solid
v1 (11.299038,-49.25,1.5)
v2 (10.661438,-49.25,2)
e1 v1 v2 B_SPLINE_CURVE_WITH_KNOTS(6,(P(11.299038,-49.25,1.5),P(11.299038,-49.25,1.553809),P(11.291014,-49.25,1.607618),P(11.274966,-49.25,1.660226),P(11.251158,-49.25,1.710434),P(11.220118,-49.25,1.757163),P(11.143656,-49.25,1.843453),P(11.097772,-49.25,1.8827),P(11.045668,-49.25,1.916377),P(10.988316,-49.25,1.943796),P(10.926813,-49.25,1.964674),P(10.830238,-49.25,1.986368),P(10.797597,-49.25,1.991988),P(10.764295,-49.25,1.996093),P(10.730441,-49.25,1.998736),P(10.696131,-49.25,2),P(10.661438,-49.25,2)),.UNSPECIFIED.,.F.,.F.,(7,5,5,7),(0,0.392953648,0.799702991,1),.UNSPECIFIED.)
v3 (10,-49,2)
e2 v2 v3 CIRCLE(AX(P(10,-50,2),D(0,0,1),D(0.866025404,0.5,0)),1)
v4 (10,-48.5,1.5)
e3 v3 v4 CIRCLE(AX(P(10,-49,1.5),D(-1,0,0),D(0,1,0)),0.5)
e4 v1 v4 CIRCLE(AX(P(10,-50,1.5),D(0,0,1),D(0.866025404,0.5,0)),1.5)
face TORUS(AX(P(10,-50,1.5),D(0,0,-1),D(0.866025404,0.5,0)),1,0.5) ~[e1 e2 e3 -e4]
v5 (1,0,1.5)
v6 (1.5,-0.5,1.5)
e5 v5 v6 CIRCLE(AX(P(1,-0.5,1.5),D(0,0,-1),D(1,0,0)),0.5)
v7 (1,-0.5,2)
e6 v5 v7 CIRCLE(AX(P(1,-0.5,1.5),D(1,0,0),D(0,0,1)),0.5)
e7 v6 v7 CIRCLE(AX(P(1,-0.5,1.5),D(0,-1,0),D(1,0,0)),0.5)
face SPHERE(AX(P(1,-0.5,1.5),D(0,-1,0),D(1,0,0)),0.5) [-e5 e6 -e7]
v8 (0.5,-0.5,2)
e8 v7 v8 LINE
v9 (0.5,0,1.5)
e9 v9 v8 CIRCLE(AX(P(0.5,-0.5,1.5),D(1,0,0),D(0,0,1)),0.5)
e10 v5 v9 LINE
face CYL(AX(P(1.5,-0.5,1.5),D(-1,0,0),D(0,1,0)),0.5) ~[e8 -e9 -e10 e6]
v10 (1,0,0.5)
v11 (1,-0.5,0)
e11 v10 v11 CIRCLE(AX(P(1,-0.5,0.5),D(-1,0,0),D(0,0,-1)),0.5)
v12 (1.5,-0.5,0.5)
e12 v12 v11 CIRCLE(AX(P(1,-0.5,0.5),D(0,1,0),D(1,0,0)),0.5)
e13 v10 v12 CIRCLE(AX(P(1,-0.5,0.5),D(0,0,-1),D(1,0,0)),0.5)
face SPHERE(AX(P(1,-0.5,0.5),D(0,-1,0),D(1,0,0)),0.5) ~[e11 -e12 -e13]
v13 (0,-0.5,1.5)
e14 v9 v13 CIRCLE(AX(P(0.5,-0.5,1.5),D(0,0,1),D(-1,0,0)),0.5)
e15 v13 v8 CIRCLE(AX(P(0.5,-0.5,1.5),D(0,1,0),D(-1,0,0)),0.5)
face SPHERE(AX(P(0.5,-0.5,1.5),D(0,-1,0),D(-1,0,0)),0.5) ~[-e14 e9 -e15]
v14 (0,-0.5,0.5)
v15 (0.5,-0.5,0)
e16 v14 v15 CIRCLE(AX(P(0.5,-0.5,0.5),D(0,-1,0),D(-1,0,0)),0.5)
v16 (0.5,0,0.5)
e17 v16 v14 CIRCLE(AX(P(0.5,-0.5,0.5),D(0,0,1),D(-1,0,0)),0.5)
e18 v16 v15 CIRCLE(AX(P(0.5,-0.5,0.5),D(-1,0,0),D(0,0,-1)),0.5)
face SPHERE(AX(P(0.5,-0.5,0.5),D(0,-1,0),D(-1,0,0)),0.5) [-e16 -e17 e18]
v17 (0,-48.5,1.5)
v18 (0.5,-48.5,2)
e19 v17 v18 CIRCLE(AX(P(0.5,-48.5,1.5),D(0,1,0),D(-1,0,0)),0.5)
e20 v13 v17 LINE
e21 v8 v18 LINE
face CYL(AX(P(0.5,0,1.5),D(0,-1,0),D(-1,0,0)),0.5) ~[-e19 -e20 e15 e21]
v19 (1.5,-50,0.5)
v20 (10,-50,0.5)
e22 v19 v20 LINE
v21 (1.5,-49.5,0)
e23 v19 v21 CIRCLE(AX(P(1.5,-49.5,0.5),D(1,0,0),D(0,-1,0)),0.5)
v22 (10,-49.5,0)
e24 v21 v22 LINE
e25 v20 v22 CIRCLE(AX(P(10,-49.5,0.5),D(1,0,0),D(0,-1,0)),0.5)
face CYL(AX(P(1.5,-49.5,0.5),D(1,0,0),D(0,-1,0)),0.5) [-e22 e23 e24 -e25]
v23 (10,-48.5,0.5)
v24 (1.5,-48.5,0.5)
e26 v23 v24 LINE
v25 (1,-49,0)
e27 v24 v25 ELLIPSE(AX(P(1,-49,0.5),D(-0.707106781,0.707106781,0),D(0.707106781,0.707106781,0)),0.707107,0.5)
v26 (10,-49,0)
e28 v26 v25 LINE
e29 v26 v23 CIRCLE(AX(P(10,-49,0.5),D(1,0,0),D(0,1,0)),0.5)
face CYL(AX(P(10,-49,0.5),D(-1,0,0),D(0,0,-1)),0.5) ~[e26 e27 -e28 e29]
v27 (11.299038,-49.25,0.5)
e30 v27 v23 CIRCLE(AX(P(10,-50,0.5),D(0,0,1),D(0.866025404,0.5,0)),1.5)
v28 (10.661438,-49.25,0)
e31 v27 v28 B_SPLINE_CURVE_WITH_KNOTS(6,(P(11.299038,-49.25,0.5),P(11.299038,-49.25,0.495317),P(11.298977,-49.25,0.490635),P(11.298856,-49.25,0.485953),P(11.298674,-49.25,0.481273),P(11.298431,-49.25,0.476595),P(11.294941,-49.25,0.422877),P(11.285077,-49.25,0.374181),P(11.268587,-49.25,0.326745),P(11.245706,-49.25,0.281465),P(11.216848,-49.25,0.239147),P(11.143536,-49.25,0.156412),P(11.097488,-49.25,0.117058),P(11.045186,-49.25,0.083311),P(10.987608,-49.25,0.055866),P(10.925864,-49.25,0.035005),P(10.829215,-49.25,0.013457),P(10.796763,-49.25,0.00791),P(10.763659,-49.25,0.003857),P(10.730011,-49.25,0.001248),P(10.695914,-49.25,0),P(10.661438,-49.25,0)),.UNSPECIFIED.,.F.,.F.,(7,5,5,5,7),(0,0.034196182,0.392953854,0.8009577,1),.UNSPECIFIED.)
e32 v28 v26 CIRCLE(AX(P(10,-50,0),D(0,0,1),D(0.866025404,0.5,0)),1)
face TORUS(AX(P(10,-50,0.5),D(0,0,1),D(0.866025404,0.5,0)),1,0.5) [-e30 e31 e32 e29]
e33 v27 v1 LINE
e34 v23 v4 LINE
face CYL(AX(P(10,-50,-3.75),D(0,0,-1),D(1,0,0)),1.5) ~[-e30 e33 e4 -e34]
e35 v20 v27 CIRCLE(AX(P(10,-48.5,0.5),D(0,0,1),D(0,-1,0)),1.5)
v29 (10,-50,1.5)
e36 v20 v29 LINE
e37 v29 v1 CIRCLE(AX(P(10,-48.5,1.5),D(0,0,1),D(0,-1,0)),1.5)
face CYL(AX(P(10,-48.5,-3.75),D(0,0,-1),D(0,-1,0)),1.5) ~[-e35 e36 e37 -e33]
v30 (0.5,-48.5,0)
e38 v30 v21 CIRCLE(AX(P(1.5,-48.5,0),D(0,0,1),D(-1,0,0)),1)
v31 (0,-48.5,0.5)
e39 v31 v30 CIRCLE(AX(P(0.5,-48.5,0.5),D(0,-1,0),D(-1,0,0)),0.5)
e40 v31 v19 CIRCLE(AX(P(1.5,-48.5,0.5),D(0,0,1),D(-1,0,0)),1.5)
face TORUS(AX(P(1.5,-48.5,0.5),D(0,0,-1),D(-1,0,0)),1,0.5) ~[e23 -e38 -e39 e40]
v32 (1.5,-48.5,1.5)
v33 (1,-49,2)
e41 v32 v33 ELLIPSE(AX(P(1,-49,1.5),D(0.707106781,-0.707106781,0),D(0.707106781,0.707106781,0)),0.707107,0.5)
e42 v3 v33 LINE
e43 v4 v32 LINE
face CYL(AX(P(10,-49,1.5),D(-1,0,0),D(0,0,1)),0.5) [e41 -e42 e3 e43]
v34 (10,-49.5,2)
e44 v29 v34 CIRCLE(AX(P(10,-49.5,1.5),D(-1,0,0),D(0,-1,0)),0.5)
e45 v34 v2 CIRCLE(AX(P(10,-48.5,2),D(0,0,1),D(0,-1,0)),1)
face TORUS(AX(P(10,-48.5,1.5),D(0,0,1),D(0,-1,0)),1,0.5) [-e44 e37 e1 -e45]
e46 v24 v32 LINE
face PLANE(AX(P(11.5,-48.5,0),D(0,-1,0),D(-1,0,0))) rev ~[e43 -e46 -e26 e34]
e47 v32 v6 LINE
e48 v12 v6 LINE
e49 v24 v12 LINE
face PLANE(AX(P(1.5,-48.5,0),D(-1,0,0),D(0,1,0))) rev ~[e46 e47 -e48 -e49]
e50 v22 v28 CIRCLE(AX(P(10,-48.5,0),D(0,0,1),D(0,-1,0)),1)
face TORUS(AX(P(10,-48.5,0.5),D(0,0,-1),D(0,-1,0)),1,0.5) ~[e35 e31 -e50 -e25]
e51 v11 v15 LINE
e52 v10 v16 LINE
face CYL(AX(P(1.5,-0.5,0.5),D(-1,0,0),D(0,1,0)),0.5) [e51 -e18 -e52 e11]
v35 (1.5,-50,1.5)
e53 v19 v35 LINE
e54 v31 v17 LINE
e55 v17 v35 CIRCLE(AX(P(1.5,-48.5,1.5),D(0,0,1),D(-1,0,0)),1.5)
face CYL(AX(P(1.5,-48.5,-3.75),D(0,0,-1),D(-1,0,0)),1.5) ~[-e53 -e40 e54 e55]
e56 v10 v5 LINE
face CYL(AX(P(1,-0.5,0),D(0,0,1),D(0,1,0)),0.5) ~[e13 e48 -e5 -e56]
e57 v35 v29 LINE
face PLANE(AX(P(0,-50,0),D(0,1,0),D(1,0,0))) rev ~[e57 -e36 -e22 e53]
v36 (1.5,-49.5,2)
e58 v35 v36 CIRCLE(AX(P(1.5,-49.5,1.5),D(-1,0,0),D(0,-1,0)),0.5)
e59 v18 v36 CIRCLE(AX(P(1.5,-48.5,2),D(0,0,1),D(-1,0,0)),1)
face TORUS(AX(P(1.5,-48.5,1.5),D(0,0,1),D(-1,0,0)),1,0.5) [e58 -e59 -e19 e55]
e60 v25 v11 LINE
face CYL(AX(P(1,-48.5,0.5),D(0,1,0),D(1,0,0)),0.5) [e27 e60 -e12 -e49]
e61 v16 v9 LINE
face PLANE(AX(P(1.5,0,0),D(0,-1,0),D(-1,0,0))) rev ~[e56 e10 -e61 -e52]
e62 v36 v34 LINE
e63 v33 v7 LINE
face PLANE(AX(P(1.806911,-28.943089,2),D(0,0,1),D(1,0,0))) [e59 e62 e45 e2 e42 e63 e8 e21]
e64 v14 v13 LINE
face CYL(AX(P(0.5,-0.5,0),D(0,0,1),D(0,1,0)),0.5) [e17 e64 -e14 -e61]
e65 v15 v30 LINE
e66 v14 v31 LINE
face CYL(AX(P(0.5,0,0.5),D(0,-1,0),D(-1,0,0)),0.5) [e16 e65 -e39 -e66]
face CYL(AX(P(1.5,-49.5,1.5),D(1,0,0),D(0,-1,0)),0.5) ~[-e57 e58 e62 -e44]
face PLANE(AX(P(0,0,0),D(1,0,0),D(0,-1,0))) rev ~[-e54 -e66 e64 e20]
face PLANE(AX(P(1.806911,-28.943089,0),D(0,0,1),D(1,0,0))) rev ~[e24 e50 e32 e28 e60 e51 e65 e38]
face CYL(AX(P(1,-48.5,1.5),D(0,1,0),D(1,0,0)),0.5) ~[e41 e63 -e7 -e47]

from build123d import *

# Parameters (mm, degrees)
F1_DEPTH    = 2
F2_T1_DEPTH = 9.5
F3_R        = 0.5


# Not quite as in the source:
# - a fillet or chamfer that OpenCascade refuses, or shapes differently, is made with other operations: its cross-section is extruded or revolved along the edge and cut away or added


with BuildPart() as f1:
    # F0 (on Top) → F1 (new body)
    with BuildSketch(Plane.XY):
        Polygon((1.5, 0), (0, 0), (0, -50), (11.5, -50), (11.5, -48.5), (1.5, -48.5), align=None)
    extrude(amount=F1_DEPTH)

    # F2: fillet of radius 1.5 on 3 edges, made by hand

    # F2_s2 → F2_t1 (cut)
    with BuildSketch(Plane.XY.offset(-3.75)):
        with BuildLine():
            ThreePointArc((10, -50), (11.0606601718, -49.5606601718), (11.5, -48.5))
            Line((11.5, -48.5), (11.5, -50))
            Line((11.5, -50), (10, -50))
        make_face()
        with BuildLine():
            ThreePointArc((0, -48.5), (0.4393398282, -49.5606601718), (1.5, -50))
            Line((1.5, -50), (0, -50))
            Line((0, -50), (0, -48.5))
        make_face()
        with BuildLine():
            ThreePointArc((11.5, -50), (11.0606601718, -48.9393398282), (10, -48.5))
            Line((10, -48.5), (11.5, -48.5))
            Line((11.5, -48.5), (11.5, -50))
        make_face()
    extrude(amount=F2_T1_DEPTH, mode=Mode.SUBTRACT)

    # F3
    f3_edges = [f1.edges().sort_by_distance(p)[0] for p in [
        (0, -24.25, 2),
        (0, -24.25, 0),
        (1.5, -24.25, 0),
        (1.5, -24.25, 2),
        (1.5, 0, 1),
        (0, 0, 1),
        (0.75, 0, 0),
        (0.75, 0, 2),
        (5.75, -48.5, 0),
        (10.75, -48.700962, 0),
        (10.75, -49.799038, 0),
        (5.75, -50, 0),
        (0.43934, -49.56066, 0),
        (5.75, -48.5, 2),
        (10.75, -48.700962, 2),
        (10.75, -49.799038, 2),
        (5.75, -50, 2),
        (0.43934, -49.56066, 2),
    ]]
    fillet(f3_edges, radius=F3_R)


solid = f1.part
